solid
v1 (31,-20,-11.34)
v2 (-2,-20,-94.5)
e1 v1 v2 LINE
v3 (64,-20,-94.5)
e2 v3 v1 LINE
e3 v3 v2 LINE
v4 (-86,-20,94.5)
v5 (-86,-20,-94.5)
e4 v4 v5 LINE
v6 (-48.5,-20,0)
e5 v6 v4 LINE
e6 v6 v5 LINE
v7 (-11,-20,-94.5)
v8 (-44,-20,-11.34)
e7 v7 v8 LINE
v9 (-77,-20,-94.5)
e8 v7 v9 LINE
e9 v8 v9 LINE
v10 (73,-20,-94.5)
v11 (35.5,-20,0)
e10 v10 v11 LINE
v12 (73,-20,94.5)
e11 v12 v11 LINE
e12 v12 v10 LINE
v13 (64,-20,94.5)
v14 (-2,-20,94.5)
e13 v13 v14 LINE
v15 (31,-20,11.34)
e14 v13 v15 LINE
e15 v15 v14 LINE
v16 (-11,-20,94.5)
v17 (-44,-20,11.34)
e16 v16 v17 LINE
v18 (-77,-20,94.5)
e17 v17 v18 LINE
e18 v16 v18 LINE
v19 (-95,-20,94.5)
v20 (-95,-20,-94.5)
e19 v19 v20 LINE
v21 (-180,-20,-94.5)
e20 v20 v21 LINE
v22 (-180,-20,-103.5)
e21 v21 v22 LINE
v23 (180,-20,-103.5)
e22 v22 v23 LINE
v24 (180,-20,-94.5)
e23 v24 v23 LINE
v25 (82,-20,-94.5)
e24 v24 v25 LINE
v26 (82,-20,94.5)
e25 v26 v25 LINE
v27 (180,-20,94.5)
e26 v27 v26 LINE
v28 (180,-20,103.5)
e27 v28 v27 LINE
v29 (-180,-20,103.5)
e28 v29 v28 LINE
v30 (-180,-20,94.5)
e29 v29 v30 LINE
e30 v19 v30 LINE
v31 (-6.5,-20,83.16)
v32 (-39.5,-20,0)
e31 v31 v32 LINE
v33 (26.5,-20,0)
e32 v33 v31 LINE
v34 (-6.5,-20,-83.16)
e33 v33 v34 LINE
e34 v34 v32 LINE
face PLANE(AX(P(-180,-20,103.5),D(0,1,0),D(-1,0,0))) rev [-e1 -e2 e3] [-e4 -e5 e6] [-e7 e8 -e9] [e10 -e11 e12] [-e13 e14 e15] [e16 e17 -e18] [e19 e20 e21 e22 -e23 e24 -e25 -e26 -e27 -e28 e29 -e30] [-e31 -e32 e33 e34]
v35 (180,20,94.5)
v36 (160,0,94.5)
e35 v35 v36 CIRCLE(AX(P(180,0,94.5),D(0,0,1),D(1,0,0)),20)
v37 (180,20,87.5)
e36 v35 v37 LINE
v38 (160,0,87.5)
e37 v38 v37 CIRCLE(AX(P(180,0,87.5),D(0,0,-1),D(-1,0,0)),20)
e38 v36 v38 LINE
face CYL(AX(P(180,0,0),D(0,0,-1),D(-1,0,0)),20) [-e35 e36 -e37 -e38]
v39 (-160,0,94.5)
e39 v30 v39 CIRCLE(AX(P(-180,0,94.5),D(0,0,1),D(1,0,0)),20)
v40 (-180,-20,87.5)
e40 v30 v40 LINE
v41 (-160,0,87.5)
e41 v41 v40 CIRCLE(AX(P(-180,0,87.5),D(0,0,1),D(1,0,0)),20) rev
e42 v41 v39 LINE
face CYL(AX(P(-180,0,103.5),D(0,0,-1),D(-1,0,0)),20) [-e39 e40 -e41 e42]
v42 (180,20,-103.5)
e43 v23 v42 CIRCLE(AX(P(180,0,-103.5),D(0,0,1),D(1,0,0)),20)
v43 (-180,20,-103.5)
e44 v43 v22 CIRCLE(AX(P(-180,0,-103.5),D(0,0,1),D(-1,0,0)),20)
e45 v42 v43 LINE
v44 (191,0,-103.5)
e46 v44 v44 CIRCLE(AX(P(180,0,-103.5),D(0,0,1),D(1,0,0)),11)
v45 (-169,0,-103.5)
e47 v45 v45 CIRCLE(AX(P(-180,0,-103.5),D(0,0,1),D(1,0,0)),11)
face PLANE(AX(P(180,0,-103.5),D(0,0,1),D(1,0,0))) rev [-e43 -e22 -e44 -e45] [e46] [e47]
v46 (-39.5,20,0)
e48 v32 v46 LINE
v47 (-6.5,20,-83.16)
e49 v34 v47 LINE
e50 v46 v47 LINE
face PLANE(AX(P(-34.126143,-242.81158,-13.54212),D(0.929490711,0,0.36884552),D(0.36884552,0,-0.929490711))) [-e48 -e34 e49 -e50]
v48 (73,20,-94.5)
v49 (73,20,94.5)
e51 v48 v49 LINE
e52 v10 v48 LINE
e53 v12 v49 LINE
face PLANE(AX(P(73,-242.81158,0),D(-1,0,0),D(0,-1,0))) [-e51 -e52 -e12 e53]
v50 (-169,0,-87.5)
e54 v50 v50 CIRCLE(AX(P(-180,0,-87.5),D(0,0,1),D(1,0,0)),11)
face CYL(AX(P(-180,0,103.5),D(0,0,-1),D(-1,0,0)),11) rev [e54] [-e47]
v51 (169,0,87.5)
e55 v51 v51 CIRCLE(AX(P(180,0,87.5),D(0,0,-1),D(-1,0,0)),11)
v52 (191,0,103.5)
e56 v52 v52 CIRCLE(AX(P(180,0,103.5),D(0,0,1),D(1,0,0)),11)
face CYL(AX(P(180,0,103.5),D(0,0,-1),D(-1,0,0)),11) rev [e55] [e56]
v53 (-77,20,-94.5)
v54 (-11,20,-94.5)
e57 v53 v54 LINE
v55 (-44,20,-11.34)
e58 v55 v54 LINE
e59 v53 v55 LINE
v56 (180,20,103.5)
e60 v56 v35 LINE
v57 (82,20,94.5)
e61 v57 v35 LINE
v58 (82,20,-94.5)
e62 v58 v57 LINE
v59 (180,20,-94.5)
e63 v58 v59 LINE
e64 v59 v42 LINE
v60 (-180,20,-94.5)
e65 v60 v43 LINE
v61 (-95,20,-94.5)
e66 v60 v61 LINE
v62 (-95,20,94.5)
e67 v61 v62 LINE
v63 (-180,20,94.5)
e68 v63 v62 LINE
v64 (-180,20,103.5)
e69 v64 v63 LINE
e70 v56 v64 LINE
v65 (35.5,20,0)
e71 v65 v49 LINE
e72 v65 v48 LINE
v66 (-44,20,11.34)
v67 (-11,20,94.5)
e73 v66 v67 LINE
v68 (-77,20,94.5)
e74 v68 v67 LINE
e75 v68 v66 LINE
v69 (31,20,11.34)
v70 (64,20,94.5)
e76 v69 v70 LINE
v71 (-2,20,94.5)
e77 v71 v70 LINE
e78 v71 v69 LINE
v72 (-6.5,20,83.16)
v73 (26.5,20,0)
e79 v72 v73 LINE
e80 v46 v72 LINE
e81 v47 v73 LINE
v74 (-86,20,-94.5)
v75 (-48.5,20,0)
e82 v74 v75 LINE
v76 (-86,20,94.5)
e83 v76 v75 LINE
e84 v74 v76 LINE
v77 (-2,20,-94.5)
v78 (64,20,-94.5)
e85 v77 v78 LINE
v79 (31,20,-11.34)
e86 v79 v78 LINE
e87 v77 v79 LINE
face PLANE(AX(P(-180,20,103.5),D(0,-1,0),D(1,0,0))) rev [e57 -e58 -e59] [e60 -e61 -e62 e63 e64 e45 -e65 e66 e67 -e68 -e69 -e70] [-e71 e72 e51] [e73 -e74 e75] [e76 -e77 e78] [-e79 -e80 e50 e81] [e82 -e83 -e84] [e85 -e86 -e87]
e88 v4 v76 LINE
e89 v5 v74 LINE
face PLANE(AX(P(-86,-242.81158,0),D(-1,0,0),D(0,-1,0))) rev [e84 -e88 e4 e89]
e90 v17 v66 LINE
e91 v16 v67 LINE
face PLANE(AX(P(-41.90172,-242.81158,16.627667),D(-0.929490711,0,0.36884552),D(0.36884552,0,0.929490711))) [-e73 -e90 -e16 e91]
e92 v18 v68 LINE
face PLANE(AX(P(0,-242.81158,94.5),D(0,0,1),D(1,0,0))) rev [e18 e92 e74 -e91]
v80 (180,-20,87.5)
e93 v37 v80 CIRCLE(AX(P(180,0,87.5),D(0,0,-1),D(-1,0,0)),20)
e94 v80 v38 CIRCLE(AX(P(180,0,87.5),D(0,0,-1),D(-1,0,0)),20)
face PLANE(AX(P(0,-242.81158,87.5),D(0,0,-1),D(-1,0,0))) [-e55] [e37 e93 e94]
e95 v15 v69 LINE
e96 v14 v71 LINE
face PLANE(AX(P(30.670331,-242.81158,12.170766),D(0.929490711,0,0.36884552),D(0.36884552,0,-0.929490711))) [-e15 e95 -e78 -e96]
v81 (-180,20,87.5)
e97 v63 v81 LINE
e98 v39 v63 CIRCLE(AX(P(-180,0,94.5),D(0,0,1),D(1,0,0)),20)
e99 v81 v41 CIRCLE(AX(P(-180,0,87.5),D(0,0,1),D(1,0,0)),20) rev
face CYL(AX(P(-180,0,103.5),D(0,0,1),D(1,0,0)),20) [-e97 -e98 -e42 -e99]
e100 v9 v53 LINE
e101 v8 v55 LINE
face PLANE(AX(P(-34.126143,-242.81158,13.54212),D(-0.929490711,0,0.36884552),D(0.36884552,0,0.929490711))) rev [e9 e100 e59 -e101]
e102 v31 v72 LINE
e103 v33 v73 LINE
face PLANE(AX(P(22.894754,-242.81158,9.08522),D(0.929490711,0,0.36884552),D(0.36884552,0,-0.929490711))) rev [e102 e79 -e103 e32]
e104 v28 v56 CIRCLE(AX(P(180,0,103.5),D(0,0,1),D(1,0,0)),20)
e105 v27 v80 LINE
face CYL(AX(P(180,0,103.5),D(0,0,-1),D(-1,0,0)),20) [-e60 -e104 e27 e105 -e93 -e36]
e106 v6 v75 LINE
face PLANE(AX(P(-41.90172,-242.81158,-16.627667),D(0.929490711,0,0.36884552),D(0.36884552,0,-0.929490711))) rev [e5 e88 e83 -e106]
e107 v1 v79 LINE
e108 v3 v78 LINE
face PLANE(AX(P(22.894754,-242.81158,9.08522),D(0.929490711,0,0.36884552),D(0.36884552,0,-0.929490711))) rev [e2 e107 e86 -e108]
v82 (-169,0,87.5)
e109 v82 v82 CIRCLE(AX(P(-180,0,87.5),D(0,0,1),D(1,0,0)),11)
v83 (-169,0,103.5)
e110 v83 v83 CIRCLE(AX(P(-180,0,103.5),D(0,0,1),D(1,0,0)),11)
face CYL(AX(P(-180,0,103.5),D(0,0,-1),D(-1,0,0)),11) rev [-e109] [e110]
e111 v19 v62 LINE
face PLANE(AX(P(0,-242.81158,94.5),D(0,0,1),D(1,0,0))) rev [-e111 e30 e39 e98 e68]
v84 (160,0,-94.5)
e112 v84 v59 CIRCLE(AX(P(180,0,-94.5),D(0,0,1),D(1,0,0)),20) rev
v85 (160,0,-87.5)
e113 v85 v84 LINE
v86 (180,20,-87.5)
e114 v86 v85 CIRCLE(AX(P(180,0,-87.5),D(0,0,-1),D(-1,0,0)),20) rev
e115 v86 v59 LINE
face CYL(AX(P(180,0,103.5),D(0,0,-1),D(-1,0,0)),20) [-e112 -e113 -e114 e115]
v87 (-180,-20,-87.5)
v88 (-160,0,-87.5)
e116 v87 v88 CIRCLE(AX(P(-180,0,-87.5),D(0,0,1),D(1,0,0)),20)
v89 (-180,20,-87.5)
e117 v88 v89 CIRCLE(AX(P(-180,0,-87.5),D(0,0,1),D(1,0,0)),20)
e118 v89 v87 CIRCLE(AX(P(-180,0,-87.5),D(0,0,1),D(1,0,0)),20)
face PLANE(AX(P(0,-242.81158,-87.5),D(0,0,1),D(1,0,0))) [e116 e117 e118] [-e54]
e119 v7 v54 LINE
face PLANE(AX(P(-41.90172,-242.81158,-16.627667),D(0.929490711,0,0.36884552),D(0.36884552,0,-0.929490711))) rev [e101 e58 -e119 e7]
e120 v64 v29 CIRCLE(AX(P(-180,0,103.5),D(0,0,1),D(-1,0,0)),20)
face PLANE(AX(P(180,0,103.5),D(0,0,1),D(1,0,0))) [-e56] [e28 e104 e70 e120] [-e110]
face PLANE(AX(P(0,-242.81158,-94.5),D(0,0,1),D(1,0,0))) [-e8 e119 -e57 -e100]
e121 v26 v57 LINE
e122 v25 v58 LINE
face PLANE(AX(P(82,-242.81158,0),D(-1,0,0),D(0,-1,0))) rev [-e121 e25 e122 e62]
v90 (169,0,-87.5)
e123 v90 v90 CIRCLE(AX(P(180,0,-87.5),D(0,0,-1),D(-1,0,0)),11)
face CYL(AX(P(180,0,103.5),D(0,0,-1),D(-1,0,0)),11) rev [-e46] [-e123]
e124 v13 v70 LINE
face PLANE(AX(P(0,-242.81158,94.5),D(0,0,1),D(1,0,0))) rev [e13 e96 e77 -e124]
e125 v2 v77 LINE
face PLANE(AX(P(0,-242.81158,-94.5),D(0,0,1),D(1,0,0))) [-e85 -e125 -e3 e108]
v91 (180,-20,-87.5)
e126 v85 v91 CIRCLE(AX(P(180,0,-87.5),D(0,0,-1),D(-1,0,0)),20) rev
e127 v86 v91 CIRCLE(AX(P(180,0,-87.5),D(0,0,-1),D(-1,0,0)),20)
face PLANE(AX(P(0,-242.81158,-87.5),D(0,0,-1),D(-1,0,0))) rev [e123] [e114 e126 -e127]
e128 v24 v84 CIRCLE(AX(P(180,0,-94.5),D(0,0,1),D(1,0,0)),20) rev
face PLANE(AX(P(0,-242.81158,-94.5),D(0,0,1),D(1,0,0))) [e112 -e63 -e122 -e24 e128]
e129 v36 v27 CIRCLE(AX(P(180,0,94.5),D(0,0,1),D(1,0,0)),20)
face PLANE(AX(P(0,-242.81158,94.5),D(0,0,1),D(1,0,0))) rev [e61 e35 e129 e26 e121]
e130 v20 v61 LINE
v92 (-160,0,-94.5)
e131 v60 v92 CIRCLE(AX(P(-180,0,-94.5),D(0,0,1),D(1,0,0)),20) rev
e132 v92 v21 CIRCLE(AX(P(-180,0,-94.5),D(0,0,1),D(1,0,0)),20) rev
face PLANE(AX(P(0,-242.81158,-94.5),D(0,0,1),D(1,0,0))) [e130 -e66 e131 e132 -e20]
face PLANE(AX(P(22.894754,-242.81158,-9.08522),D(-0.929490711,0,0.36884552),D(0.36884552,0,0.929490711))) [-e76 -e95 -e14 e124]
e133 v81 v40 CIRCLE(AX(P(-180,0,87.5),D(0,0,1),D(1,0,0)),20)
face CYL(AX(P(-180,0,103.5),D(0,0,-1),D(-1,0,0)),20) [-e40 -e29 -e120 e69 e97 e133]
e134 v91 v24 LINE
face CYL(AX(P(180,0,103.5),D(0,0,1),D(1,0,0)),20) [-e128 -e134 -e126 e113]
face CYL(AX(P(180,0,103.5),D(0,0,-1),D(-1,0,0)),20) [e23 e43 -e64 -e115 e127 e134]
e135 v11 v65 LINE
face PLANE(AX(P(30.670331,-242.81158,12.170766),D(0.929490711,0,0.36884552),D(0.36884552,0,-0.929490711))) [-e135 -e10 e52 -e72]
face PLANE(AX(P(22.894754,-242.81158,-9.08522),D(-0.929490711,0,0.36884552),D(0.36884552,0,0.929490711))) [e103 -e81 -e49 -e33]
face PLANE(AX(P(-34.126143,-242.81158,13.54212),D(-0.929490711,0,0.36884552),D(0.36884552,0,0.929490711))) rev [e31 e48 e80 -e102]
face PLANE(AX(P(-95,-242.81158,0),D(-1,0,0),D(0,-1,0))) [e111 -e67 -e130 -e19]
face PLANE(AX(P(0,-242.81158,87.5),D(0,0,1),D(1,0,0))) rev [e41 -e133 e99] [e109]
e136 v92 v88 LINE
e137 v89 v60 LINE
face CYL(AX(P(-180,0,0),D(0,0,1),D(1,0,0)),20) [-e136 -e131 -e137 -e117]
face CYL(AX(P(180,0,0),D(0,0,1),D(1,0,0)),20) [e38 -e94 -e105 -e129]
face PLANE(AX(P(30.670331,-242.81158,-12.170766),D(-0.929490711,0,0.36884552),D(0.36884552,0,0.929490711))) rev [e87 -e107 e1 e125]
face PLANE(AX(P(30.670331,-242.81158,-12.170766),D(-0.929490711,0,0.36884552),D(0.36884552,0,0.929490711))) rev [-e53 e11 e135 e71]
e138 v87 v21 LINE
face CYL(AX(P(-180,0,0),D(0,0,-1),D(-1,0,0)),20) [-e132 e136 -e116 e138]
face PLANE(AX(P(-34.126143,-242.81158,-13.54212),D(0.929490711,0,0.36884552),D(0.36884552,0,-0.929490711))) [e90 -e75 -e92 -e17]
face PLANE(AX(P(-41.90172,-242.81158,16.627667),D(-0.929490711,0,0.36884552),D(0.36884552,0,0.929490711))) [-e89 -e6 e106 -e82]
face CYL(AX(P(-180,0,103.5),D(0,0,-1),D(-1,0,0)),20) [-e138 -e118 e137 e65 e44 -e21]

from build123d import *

# Parameters (mm, degrees)
SKETCH1_R           = 11
BOSS_EXTRUDE1_DEPTH = 103.5
CUT_EXTRUDE1_REACH  = 230.719
SKETCH5_W           = 20
SKETCH5_H           = 175
FILLET1_R           = 20


with BuildPart() as part:
    # Sketch1 → Boss-Extrude1 (new, symmetric)
    with BuildSketch(Plane.XY):
        with BuildLine():
            Line((-180, -20), (180, -20))
            ThreePointArc((180, -20), (200, 0), (180, 20))
            Line((180, 20), (-180, 20))
            ThreePointArc((-180, 20), (-200, 0), (-180, -20))
        make_face()
        with Locations((-180, 0)):
            Circle(SKETCH1_R, mode=Mode.SUBTRACT)
        with Locations((180, 0)):
            Circle(SKETCH1_R, mode=Mode.SUBTRACT)
    extrude(amount=BOSS_EXTRUDE1_DEPTH, both=True)

    # Cut-Extrude1: up to this face of the body (flat: up to its plane)
    cut_extrude1_end = Plane(part.part.faces().sort_by_distance((0, -20, 0))[0])
    # Sketch5 → Cut-Extrude1 (cut, up to the picked face)
    with BuildSketch(Plane(origin=(0, 20, 0), x_dir=(1, 0, 0), z_dir=(0, 1, 0)), mode=Mode.PRIVATE) as cut_extrude1_sk1:
        Polygon((-95, -94.5), (-95, 94.5), (-160, 94.5), (-160, 87.5), (-180, 87.5), (-180, -87.5), (-160, -87.5), (-160, -94.5), align=None)
    cut_extrude1_tool1 = split(extrude(cut_extrude1_sk1.sketch, amount=-CUT_EXTRUDE1_REACH, mode=Mode.PRIVATE), bisect_by=cut_extrude1_end, keep=Keep.BOTH, mode=Mode.PRIVATE)
    # Sketch5 → Cut-Extrude1 (cut, up to the picked face)
    with BuildSketch(Plane(origin=(0, 20, 0), x_dir=(1, 0, 0), z_dir=(0, 1, 0)), mode=Mode.PRIVATE) as cut_extrude1_sk2:
        with Locations((-190, 0)):
            Rectangle(SKETCH5_W, SKETCH5_H)
    cut_extrude1_tool2 = split(extrude(cut_extrude1_sk2.sketch, amount=-CUT_EXTRUDE1_REACH, mode=Mode.PRIVATE), bisect_by=cut_extrude1_end, keep=Keep.BOTH, mode=Mode.PRIVATE)
    # Sketch5 → Cut-Extrude1 (cut, up to the picked face)
    with BuildSketch(Plane(origin=(0, 20, 0), x_dir=(1, 0, 0), z_dir=(0, 1, 0)), mode=Mode.PRIVATE) as cut_extrude1_sk3:
        Polygon((-48.5, 0), (-86, 94.5), (-86, -94.5), align=None)
    cut_extrude1_tool3 = split(extrude(cut_extrude1_sk3.sketch, amount=-CUT_EXTRUDE1_REACH, mode=Mode.PRIVATE), bisect_by=cut_extrude1_end, keep=Keep.BOTH, mode=Mode.PRIVATE)
    # Sketch5 → Cut-Extrude1 (cut, up to the picked face)
    with BuildSketch(Plane(origin=(0, 20, 0), x_dir=(1, 0, 0), z_dir=(0, 1, 0)), mode=Mode.PRIVATE) as cut_extrude1_sk4:
        Polygon((-11, 94.5), (-77, 94.5), (-44, 11.34), align=None)
    cut_extrude1_tool4 = split(extrude(cut_extrude1_sk4.sketch, amount=-CUT_EXTRUDE1_REACH, mode=Mode.PRIVATE), bisect_by=cut_extrude1_end, keep=Keep.BOTH, mode=Mode.PRIVATE)
    # Sketch5 → Cut-Extrude1 (cut, up to the picked face)
    with BuildSketch(Plane(origin=(0, 20, 0), x_dir=(1, 0, 0), z_dir=(0, 1, 0)), mode=Mode.PRIVATE) as cut_extrude1_sk5:
        Polygon((26.5, 0), (-6.5, 83.16), (-39.5, 0), (-6.5, -83.16), align=None)
    cut_extrude1_tool5 = split(extrude(cut_extrude1_sk5.sketch, amount=-CUT_EXTRUDE1_REACH, mode=Mode.PRIVATE), bisect_by=cut_extrude1_end, keep=Keep.BOTH, mode=Mode.PRIVATE)
    # Sketch5 → Cut-Extrude1 (cut, up to the picked face)
    with BuildSketch(Plane(origin=(0, 20, 0), x_dir=(1, 0, 0), z_dir=(0, 1, 0)), mode=Mode.PRIVATE) as cut_extrude1_sk6:
        Polygon((-44, -11.34), (-77, -94.5), (-11, -94.5), align=None)
    cut_extrude1_tool6 = split(extrude(cut_extrude1_sk6.sketch, amount=-CUT_EXTRUDE1_REACH, mode=Mode.PRIVATE), bisect_by=cut_extrude1_end, keep=Keep.BOTH, mode=Mode.PRIVATE)
    # Sketch5 → Cut-Extrude1 (cut, up to the picked face)
    with BuildSketch(Plane(origin=(0, 20, 0), x_dir=(1, 0, 0), z_dir=(0, 1, 0)), mode=Mode.PRIVATE) as cut_extrude1_sk7:
        Polygon((64, 94.5), (-2, 94.5), (31, 11.34), align=None)
    cut_extrude1_tool7 = split(extrude(cut_extrude1_sk7.sketch, amount=-CUT_EXTRUDE1_REACH, mode=Mode.PRIVATE), bisect_by=cut_extrude1_end, keep=Keep.BOTH, mode=Mode.PRIVATE)
    # Sketch5 → Cut-Extrude1 (cut, up to the picked face)
    with BuildSketch(Plane(origin=(0, 20, 0), x_dir=(1, 0, 0), z_dir=(0, 1, 0)), mode=Mode.PRIVATE) as cut_extrude1_sk8:
        Polygon((73, -94.5), (73, 94.5), (35.5, 0), align=None)
    cut_extrude1_tool8 = split(extrude(cut_extrude1_sk8.sketch, amount=-CUT_EXTRUDE1_REACH, mode=Mode.PRIVATE), bisect_by=cut_extrude1_end, keep=Keep.BOTH, mode=Mode.PRIVATE)
    # Sketch5 → Cut-Extrude1 (cut, up to the picked face)
    with BuildSketch(Plane(origin=(0, 20, 0), x_dir=(1, 0, 0), z_dir=(0, 1, 0)), mode=Mode.PRIVATE) as cut_extrude1_sk9:
        Polygon((31, -11.34), (-2, -94.5), (64, -94.5), align=None)
    cut_extrude1_tool9 = split(extrude(cut_extrude1_sk9.sketch, amount=-CUT_EXTRUDE1_REACH, mode=Mode.PRIVATE), bisect_by=cut_extrude1_end, keep=Keep.BOTH, mode=Mode.PRIVATE)
    # Sketch5 → Cut-Extrude1 (cut, up to the picked face)
    with BuildSketch(Plane(origin=(0, 20, 0), x_dir=(1, 0, 0), z_dir=(0, 1, 0)), mode=Mode.PRIVATE) as cut_extrude1_sk10:
        Polygon((160, 87.5), (160, 94.5), (82, 94.5), (82, -94.5), (160, -94.5), (160, -87.5), (180, -87.5), (180, 87.5), align=None)
    cut_extrude1_tool10 = split(extrude(cut_extrude1_sk10.sketch, amount=-CUT_EXTRUDE1_REACH, mode=Mode.PRIVATE), bisect_by=cut_extrude1_end, keep=Keep.BOTH, mode=Mode.PRIVATE)
    # Sketch5 → Cut-Extrude1 (cut, up to the picked face)
    with BuildSketch(Plane(origin=(0, 20, 0), x_dir=(1, 0, 0), z_dir=(0, 1, 0)), mode=Mode.PRIVATE) as cut_extrude1_sk11:
        with Locations((190, 0)):
            Rectangle(SKETCH5_W, SKETCH5_H)
    cut_extrude1_tool11 = split(extrude(cut_extrude1_sk11.sketch, amount=-CUT_EXTRUDE1_REACH, mode=Mode.PRIVATE), bisect_by=cut_extrude1_end, keep=Keep.BOTH, mode=Mode.PRIVATE)
    add(cut_extrude1_tool1.solids().sort_by(Axis((-136.923503, 20, 0), (0, -1, 0)))[0], mode=Mode.SUBTRACT)
    add(cut_extrude1_tool2.solids().sort_by(Axis((-190, 20, 0), (0, -1, 0)))[0], mode=Mode.SUBTRACT)
    add(cut_extrude1_tool3.solids().sort_by(Axis((-73.5, 20, 0), (0, -1, 0)))[0], mode=Mode.SUBTRACT)
    add(cut_extrude1_tool4.solids().sort_by(Axis((-44, 20, -66.78), (0, -1, 0)))[0], mode=Mode.SUBTRACT)
    add(cut_extrude1_tool5.solids().sort_by(Axis((-6.5, 20, 0), (0, -1, 0)))[0], mode=Mode.SUBTRACT)
    add(cut_extrude1_tool6.solids().sort_by(Axis((-44, 20, 66.78), (0, -1, 0)))[0], mode=Mode.SUBTRACT)
    add(cut_extrude1_tool7.solids().sort_by(Axis((31, 20, -66.78), (0, -1, 0)))[0], mode=Mode.SUBTRACT)
    add(cut_extrude1_tool8.solids().sort_by(Axis((60.5, 20, 0), (0, -1, 0)))[0], mode=Mode.SUBTRACT)
    add(cut_extrude1_tool9.solids().sort_by(Axis((31, 20, 66.78), (0, -1, 0)))[0], mode=Mode.SUBTRACT)
    add(cut_extrude1_tool10.solids().sort_by(Axis((130.401381, 20, 0), (0, -1, 0)))[0], mode=Mode.SUBTRACT)
    add(cut_extrude1_tool11.solids().sort_by(Axis((190, 20, 0), (0, -1, 0)))[0], mode=Mode.SUBTRACT)

    # Fillet1
    fillet1_edges = [part.edges().sort_by_distance(p)[0] for p in [
        (160, -20, 91),
        (160, 20, 91),
        (160, -20, -91),
        (160, 20, -91),
        (-160, -20, 91),
        (-160, 20, 91),
        (-160, -20, -91),
        (-160, 20, -91),
    ]]
    fillet(fillet1_edges, radius=FILLET1_R - 0.0001)  # a hair under: the kernel refuses the full size


solid = part.part
